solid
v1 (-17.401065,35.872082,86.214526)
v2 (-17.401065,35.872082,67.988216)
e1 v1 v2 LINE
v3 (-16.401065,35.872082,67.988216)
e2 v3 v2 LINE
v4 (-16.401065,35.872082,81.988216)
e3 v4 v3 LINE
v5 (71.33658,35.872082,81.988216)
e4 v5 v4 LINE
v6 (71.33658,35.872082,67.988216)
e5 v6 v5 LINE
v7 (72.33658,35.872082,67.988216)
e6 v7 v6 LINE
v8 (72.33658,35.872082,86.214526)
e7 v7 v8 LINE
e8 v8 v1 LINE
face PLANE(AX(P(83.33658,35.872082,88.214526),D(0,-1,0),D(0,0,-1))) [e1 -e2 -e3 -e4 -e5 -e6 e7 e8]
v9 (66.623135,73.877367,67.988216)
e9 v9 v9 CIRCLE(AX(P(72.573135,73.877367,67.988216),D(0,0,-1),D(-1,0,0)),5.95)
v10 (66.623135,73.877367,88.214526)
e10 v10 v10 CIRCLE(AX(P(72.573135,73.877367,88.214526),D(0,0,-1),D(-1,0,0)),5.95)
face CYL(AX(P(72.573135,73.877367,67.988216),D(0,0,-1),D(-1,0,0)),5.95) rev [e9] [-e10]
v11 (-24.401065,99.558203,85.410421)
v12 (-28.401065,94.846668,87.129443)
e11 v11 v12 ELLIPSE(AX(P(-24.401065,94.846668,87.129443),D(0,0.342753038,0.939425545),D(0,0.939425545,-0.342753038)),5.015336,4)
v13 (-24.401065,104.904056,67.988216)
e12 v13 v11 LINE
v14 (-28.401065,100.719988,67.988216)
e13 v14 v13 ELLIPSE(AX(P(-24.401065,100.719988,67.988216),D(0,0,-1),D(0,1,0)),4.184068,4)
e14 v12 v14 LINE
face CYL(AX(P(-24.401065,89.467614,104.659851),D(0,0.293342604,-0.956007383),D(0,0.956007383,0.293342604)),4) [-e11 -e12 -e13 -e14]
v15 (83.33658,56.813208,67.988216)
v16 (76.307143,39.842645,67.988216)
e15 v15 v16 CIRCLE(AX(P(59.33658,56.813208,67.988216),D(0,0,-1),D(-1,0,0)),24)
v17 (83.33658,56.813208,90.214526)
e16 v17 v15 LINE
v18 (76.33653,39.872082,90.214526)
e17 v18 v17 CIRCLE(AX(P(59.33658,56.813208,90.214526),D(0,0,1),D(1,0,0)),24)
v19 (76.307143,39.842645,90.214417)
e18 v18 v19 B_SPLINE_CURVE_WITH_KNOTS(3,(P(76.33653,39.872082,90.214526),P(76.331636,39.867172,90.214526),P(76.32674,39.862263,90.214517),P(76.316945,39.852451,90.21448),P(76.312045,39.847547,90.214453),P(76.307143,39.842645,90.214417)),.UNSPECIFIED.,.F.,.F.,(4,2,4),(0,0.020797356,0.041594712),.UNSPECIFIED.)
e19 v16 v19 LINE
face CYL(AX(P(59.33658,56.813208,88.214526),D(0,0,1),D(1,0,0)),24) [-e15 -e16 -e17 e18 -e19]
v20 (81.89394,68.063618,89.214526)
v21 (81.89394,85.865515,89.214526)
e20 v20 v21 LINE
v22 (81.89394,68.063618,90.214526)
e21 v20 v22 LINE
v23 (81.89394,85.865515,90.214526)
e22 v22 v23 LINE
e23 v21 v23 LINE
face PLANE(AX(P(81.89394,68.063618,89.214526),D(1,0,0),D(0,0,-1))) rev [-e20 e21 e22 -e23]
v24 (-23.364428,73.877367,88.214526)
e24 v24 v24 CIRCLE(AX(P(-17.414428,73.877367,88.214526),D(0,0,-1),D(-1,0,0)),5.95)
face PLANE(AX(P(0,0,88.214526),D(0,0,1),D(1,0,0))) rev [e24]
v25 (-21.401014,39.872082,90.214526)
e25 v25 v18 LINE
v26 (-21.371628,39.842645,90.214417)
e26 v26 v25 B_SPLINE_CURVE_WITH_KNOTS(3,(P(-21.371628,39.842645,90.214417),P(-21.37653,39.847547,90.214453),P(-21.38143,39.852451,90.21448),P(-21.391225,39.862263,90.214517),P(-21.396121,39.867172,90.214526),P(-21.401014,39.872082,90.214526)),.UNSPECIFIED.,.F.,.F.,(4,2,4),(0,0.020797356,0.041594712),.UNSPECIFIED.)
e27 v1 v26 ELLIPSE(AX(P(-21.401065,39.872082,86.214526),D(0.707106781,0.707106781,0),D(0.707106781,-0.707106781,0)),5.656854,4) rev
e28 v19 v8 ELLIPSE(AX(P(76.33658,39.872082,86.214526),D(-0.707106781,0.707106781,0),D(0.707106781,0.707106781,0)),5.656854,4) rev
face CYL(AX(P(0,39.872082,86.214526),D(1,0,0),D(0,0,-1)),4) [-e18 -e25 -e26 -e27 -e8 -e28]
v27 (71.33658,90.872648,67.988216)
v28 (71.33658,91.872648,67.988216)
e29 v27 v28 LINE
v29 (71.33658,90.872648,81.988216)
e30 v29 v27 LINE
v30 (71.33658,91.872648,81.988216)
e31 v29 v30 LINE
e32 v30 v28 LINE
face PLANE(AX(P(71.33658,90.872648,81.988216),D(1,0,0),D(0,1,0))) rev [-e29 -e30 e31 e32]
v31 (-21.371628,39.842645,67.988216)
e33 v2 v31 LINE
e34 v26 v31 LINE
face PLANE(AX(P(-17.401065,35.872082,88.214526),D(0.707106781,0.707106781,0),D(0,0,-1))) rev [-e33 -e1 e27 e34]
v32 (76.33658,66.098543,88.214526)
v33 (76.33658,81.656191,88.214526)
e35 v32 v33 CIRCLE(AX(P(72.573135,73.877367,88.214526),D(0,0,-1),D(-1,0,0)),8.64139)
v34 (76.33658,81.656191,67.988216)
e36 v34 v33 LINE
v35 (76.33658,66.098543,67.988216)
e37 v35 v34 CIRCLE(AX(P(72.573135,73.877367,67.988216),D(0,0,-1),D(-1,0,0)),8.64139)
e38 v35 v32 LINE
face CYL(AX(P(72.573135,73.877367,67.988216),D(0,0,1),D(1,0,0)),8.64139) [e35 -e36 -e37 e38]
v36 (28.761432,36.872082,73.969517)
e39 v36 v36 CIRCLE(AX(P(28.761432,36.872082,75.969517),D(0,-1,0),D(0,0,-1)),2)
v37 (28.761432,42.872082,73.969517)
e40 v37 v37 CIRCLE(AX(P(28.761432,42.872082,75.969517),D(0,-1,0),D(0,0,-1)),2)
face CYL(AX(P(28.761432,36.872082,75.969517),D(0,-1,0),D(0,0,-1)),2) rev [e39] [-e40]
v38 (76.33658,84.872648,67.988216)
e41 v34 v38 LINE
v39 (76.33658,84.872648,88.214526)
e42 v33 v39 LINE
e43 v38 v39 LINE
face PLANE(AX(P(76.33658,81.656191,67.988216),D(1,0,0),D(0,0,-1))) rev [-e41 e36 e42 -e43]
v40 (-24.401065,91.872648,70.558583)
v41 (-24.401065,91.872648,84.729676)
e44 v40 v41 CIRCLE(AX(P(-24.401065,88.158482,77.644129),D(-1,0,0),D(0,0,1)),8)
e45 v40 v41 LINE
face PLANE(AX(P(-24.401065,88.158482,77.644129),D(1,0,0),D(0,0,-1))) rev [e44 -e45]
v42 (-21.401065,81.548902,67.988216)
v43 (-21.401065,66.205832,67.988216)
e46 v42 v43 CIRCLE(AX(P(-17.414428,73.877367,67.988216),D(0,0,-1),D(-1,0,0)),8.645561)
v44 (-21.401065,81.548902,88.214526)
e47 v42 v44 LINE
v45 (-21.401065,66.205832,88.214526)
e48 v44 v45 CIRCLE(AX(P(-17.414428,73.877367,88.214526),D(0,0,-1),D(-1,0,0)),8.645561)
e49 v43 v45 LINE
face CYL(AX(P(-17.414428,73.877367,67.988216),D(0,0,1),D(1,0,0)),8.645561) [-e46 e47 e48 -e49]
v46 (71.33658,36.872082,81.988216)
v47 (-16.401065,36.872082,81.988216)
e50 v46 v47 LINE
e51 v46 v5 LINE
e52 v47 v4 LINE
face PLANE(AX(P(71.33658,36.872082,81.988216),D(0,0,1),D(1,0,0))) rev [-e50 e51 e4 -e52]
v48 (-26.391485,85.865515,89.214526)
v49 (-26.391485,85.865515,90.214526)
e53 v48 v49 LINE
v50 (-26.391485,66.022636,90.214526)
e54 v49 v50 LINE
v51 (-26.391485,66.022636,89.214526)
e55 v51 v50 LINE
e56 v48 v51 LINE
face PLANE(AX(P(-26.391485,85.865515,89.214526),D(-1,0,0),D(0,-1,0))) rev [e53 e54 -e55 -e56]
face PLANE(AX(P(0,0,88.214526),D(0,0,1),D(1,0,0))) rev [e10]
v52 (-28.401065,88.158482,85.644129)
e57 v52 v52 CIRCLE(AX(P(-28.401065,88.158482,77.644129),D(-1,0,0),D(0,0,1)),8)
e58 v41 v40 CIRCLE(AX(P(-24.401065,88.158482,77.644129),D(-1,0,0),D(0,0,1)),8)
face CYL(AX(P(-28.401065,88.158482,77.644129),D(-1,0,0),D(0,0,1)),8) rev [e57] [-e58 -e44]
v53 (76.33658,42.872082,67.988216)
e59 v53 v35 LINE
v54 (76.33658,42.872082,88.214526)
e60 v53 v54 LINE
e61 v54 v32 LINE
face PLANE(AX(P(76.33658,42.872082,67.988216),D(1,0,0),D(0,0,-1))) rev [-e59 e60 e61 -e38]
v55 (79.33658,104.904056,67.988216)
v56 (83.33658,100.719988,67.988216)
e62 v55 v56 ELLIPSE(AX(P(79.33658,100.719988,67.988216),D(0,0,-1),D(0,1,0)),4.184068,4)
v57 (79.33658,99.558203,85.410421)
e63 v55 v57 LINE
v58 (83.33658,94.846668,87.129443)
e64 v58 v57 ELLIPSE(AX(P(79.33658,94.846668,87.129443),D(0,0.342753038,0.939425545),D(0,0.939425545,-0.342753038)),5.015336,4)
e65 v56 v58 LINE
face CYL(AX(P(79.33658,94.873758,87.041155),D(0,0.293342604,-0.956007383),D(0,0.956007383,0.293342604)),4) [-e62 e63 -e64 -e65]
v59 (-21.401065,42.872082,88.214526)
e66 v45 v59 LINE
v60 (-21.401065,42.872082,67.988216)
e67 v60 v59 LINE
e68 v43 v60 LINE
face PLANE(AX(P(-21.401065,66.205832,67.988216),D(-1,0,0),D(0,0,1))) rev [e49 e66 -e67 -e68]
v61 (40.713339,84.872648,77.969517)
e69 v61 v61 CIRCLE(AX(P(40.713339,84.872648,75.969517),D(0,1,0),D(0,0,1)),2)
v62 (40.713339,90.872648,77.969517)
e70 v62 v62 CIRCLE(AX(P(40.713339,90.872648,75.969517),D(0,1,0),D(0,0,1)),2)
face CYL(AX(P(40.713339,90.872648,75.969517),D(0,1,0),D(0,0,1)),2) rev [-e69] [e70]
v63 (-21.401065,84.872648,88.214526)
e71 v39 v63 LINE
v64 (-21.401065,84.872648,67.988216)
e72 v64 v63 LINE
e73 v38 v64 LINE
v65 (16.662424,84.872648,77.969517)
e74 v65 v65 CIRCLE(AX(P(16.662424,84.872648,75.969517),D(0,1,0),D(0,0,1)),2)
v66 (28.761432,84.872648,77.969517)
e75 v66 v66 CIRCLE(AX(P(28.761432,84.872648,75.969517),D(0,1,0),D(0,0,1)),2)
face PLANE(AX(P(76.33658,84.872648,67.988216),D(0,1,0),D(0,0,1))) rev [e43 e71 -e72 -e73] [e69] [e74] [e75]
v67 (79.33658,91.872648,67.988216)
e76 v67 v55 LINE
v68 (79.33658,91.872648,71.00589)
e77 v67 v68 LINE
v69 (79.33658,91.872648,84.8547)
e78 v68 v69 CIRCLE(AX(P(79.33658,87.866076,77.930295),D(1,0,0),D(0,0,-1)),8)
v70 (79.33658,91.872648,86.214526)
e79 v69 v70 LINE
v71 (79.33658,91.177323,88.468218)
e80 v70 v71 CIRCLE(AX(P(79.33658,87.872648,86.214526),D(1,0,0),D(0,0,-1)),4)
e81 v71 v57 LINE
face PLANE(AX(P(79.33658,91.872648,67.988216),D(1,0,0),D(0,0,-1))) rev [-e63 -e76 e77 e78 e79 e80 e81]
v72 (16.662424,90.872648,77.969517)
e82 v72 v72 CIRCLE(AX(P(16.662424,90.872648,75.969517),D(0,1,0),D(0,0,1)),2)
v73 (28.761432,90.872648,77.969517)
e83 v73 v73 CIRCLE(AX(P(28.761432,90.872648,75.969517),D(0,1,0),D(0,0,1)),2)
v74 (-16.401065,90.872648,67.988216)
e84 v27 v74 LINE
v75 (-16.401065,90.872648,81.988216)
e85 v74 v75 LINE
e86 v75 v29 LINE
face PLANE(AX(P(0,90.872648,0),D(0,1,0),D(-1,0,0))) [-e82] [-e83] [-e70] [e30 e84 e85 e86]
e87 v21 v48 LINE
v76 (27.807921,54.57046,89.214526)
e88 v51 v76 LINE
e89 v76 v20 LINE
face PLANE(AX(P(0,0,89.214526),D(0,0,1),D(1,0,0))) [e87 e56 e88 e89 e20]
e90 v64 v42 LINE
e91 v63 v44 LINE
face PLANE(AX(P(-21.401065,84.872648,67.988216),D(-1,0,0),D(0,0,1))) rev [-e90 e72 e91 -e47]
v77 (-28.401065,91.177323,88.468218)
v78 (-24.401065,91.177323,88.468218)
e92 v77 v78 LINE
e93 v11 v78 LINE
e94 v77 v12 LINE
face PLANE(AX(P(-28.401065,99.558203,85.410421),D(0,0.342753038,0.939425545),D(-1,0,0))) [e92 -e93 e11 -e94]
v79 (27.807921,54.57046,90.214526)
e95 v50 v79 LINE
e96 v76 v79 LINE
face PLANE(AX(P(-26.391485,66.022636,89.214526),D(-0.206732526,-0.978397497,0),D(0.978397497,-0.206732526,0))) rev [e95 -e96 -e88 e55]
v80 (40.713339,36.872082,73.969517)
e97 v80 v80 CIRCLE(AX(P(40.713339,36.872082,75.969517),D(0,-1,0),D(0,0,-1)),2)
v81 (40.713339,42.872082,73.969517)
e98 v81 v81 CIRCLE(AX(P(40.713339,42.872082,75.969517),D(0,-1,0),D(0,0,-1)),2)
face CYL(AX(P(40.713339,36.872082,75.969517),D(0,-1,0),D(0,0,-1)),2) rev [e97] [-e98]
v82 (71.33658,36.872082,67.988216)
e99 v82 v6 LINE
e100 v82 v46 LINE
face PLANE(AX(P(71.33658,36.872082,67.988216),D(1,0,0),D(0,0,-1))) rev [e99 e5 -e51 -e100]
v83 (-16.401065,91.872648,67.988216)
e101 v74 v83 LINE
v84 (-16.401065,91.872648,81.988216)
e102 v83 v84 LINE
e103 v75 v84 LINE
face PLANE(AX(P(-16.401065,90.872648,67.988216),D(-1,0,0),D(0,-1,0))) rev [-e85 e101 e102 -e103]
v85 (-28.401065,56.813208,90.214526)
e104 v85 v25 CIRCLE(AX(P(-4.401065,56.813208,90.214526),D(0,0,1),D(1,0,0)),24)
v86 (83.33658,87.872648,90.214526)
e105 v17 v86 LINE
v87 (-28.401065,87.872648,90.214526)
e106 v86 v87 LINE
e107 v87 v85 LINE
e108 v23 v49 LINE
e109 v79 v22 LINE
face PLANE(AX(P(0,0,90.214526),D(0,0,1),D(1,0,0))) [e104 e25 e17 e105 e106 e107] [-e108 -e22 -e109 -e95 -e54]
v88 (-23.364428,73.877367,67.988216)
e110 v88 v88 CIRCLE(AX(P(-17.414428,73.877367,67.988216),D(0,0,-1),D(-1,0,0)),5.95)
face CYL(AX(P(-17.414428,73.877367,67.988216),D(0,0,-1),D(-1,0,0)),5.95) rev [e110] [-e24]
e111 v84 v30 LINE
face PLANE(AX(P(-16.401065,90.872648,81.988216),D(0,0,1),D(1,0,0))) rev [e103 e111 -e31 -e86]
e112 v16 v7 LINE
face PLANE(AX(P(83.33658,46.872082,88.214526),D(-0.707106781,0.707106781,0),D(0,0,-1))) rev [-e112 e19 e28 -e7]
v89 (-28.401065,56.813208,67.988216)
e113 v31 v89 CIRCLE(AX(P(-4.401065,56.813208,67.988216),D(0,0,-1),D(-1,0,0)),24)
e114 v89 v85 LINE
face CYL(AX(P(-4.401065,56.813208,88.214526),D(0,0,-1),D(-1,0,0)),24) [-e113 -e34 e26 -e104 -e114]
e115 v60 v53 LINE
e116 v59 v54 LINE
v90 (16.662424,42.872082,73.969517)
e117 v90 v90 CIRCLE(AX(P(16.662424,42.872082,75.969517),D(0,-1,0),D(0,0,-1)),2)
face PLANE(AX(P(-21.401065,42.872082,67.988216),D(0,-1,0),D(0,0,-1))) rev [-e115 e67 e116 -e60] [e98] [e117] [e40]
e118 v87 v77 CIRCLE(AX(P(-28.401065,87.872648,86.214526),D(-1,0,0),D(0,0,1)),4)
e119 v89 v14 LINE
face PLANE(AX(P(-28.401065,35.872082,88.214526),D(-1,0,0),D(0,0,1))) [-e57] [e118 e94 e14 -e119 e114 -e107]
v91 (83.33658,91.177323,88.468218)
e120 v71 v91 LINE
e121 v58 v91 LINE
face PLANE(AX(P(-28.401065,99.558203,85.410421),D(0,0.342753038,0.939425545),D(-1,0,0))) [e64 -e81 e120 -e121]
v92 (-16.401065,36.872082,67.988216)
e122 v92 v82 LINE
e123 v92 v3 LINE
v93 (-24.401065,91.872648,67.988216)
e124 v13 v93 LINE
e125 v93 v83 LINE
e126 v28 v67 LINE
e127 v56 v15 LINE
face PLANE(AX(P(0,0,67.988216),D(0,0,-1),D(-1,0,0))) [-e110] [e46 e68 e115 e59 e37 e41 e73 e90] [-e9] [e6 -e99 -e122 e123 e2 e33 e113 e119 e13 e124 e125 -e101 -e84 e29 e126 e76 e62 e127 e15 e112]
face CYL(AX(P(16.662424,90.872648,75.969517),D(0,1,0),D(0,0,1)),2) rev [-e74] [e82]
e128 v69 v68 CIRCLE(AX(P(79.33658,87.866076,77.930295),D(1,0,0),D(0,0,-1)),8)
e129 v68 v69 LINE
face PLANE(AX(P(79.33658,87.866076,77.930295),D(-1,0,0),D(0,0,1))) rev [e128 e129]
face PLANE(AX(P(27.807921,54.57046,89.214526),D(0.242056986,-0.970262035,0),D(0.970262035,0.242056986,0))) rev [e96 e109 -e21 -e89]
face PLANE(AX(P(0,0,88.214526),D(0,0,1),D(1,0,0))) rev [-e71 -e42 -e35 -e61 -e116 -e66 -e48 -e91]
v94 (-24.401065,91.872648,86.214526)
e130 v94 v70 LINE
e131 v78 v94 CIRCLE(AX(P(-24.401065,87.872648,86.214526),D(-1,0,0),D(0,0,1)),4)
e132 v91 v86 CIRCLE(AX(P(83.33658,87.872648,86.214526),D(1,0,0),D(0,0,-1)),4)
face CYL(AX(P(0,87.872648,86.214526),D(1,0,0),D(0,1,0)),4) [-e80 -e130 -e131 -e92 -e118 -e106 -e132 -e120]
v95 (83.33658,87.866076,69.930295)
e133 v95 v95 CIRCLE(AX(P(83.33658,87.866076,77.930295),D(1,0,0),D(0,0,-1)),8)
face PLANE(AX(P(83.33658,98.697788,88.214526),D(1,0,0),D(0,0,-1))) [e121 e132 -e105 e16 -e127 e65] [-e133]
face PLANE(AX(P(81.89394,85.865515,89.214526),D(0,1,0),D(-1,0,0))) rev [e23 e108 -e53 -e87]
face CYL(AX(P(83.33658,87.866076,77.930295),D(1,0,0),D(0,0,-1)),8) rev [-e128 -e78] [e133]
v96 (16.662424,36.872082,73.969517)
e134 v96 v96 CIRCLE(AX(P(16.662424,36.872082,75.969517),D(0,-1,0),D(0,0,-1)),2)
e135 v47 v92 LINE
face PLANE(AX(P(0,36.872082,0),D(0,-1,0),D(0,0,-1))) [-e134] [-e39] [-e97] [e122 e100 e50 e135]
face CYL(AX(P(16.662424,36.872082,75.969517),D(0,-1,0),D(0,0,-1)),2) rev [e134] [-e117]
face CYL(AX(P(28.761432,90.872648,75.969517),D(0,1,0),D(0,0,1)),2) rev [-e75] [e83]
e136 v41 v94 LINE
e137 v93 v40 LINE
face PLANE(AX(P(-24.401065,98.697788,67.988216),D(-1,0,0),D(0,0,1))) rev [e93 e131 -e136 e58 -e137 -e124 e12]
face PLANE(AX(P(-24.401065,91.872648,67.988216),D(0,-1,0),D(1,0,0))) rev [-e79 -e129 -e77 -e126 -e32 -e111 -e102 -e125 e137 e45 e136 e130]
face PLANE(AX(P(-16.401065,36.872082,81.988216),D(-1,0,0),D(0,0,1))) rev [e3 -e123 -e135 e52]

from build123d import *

# Parameters (mm, degrees)
SKETCH4_W                      = 111.737645783
SKETCH4_H                      = 62.825705526
BOSS_EXTRUDE3_DEPTH            = 20.22630919
SKETCH5_W                      = 103.737645783
SKETCH5_H                      = 6.825139403
CUT_EXTRUDE1_DEPTH             = 131.749158903
CUT_EXTRUDE2_DEPTH             = 131.749158903
SKETCH7_W                      = 87.737645783
SKETCH7_H                      = 14
CUT_EXTRUDE3_DEPTH             = 1
SKETCH8_W                      = 87.737645783
SKETCH8_H                      = 14
CUT_EXTRUDE4_DEPTH             = 1
DRAFT1_ANGLE                   = 17.058179216
F_16_0_16_DIAMETER_HOLE1_D     = 16
F_16_0_16_DIAMETER_HOLE1_DEPTH = 4
F_16_0_16_DIAMETER_HOLE2_D     = 16
F_16_0_16_DIAMETER_HOLE2_DEPTH = 4
F_4_0_4_DIAMETER_HOLE1_D       = 4
F_4_0_4_DIAMETER_HOLE1_DEPTH   = 6
F_4_0_4_DIAMETER_HOLE2_D       = 4
F_4_0_4_DIAMETER_HOLE2_DEPTH   = 68.031973705
M10_CLEARANCE_HOLE1_D          = 11.9
CHAMFER1_SIZE                  = 6.825139403
CHAMFER1_SIZE2                 = 2.933140798
CHAMFER2_SIZE                  = 6.825139403
CHAMFER2_SIZE2                 = 2.933140798
SKETCH19_W                     = 111.737645783
SKETCH19_H                     = 56.000566123
BOSS_EXTRUDE4_DEPTH            = 2
FILLET7_R                      = 4
CHAMFER3_SIZE                  = 11
CHAMFER4_SIZE                  = 11
FILLET9_R                      = 24
FILLET10_R                     = 24
CUT_EXTRUDE6_DEPTH             = 1
FILLET13_R                     = 4
FILLET14_R                     = 4
FILLET15_R                     = 4


# Some blends are built 0.0001 mm under size
with BuildPart() as part:
    # Sketch4 → Boss-Extrude3 (new body)
    with BuildSketch(Plane(origin=(0, 0, 67.988216463), x_dir=(-1, 0, 0), z_dir=(0, 0, -1))):
        with Locations((-27.467757585, 67.284935079)):
            Rectangle(SKETCH4_W, SKETCH4_H)
    extrude(amount=-BOSS_EXTRUDE3_DEPTH)

    # Sketch5 → Cut-Extrude1 (cut, through all)
    with BuildSketch(Plane.XY.offset(88.214525653)):
        with Locations((27.467757585, 95.285218141)):
            Rectangle(SKETCH5_W, SKETCH5_H)
    extrude(amount=-CUT_EXTRUDE1_DEPTH, mode=Mode.SUBTRACT)

    # Sketch6 → Cut-Extrude2 (cut, through all)
    with BuildSketch(Plane.XY.offset(88.214525653)):
        with BuildLine():
            Line((-21.401065306, 66.205832154), (-21.401065306, 42.872082316))
            Line((-21.401065306, 42.872082316), (76.336580477, 42.872082316))
            Line((76.336580477, 42.872082316), (76.336580477, 66.098543331))
            ThreePointArc((76.336580477, 66.098543331), (63.931745492, 73.877367201), (76.336580477, 81.65619107))
            Line((76.336580477, 81.65619107), (76.336580477, 84.872648439))
            Line((76.336580477, 84.872648439), (-21.401065306, 84.872648439))
            Line((-21.401065306, 84.872648439), (-21.401065306, 81.548902247))
            ThreePointArc((-21.401065306, 81.548902247), (-8.768867408, 73.877367201), (-21.401065306, 66.205832154))
        make_face()
    extrude(amount=-CUT_EXTRUDE2_DEPTH, mode=Mode.SUBTRACT)

    # Sketch7 → Cut-Extrude3 (cut)
    with BuildSketch(Plane(origin=(0, 91.872648439, 0), x_dir=(-1, 0, 0), z_dir=(0, 1, 0))):
        with Locations((-27.467757585, 74.988216463)):
            Rectangle(SKETCH7_W, SKETCH7_H)
    extrude(amount=-CUT_EXTRUDE3_DEPTH, mode=Mode.SUBTRACT)

    # Sketch8 → Cut-Extrude4 (cut)
    with BuildSketch(Plane.XZ.offset(-35.872082316)):
        with Locations((27.467757585, 74.988216463)):
            Rectangle(SKETCH8_W, SKETCH8_H)
    extrude(amount=-CUT_EXTRUDE4_DEPTH, mode=Mode.SUBTRACT)

    # Draft1
    draft1_faces = [part.faces().sort_by_distance(p)[0] for p in [
        (-26.401065306, 98.697787842, 78.101371058),
        (81.336580477, 98.697787842, 78.101371058),
    ]]
    draft(draft1_faces, Plane.XY.offset(88.214525653), DRAFT1_ANGLE)

    # Ø16.0 (16) Diameter Hole1
    with Locations(Plane.ZY.offset(28.401065306)):
        with Locations((77.644129293, 88.158482369)):
            Hole(F_16_0_16_DIAMETER_HOLE1_D / 2, depth=F_16_0_16_DIAMETER_HOLE1_DEPTH)

    # Ø16.0 (16) Diameter Hole2
    with Locations(Plane(origin=(83.336580477, 0, 0), x_dir=(0, 0, -1), z_dir=(1, 0, 0))):
        with Locations((-77.930295014, 87.866076089)):
            Hole(F_16_0_16_DIAMETER_HOLE2_D / 2, depth=F_16_0_16_DIAMETER_HOLE2_DEPTH)

    # Ø4.0 (4) Diameter Hole1
    with Locations(Plane(origin=(0, 90.872648439, 0), x_dir=(1, 0, 0), z_dir=(0, 1, 0))):
        with Locations((40.713339239, -75.969517026), (28.761431707, -75.969517026), (16.662423773, -75.969517026)):
            Hole(F_4_0_4_DIAMETER_HOLE1_D / 2, depth=F_4_0_4_DIAMETER_HOLE1_DEPTH)

    # Ø4.0 (4) Diameter Hole2
    with Locations(Plane(origin=(0, 36.872082316, 0), x_dir=(-1, 0, 0), z_dir=(0, -1, 0))):
        with Locations((-40.713339239, -75.969517026), (-28.761431707, -75.969517026), (-16.662423773, -75.969517026)):
            Hole(F_4_0_4_DIAMETER_HOLE2_D / 2, depth=F_4_0_4_DIAMETER_HOLE2_DEPTH)

    # M10 Clearance Hole1 (through all)
    with Locations(Plane(origin=(0, 0, 67.988216463), x_dir=(-1, 0, 0), z_dir=(0, 0, -1))):
        with Locations((-72.573135404, 73.877367201), (17.414428357, 73.877367201)):
            Hole(M10_CLEARANCE_HOLE1_D / 2)

    # Chamfer1
    chamfer1_edges = [part.edges().sort_by_distance(p)[0] for p in [
        (81.336580477, 98.697787842, 88.214525653),
    ]]
    chamfer1_side = [part.faces().sort_by_distance(p)[0] for p in [
        (27.467757585, 37.153970406, 88.214525653),
    ]]
    chamfer(chamfer1_edges, length=CHAMFER1_SIZE, length2=CHAMFER1_SIZE2, reference=chamfer1_side[0])

    # Chamfer2
    chamfer2_edges = [part.edges().sort_by_distance(p)[0] for p in [
        (-26.401065306, 98.697787842, 88.214525653),
    ]]
    chamfer2_side = [part.faces().sort_by_distance(p)[0] for p in [
        (82.054692387, 63.872365377, 88.214525653),
    ]]
    chamfer(chamfer2_edges, length=CHAMFER2_SIZE, length2=CHAMFER2_SIZE2, reference=chamfer2_side[0])

    # Sketch19 → Boss-Extrude4 (add)
    with BuildSketch(Plane.XY.offset(88.214525653)):
        with Locations((27.467757585, 63.872365378)):
            Rectangle(SKETCH19_W, SKETCH19_H)
    extrude(amount=BOSS_EXTRUDE4_DEPTH)

    # Fillet7
    # the kernel refuses this fillet: 4 mm, written as the material it takes off along each edge
    with BuildSketch(Plane(origin=(93.336580477, 91.872648439, 90.214525653), x_dir=(0, 0, -1), z_dir=(-1, 0, 0))) as fillet7_piece_1_section:
        with BuildLine():
            CenterArc((FILLET7_R, FILLET7_R), FILLET7_R, 180, 90)
            Line((0, FILLET7_R), (0, 0))
            Line((0, 0), (FILLET7_R, 0))
        make_face()
    fillet7_piece_1 = extrude(amount=131.737645784, mode=Mode.PRIVATE)
    fillet7_piece_1 = split(fillet7_piece_1, bisect_by=Plane(origin=(81.336580477, 90.577181296, 88.687181842), z_dir=(0, 0.34275303765814863, 0.9394255453074032)), keep=Keep.TOP, mode=Mode.PRIVATE)
    add(fillet7_piece_1, mode=Mode.SUBTRACT)
    with BuildSketch(Plane(origin=(93.336580477, 91.872648439, 90.214525653), x_dir=(0, 0, -1), z_dir=(-1, 0, 0))) as fillet7_piece_2_section:
        with BuildLine():
            CenterArc((FILLET7_R, FILLET7_R), FILLET7_R, 180, 90)
            Line((0, FILLET7_R), (0, 0))
            Line((0, 0), (FILLET7_R, 0))
        make_face()
    fillet7_piece_2 = extrude(amount=131.737645784, mode=Mode.PRIVATE)
    fillet7_piece_2 = split(fillet7_piece_2, bisect_by=Plane(origin=(-24.401065306, 91.673256094, 87.815354023), z_dir=(1, 0, 0)), keep=Keep.TOP, mode=Mode.PRIVATE)
    fillet7_piece_2 = split(fillet7_piece_2, bisect_by=Plane(origin=(79.336580477, 91.673256094, 87.815354023), z_dir=(-1, 0, 0)), keep=Keep.TOP, mode=Mode.PRIVATE)
    add(fillet7_piece_2, mode=Mode.SUBTRACT)

    # Chamfer3
    chamfer3_edges = [part.edges().sort_by_distance(p)[0] for p in [
        (83.336580477, 35.872082316, 79.101371058),
    ]]
    chamfer(chamfer3_edges, length=CHAMFER3_SIZE)

    # Chamfer4
    chamfer4_edges = [part.edges().sort_by_distance(p)[0] for p in [
        (-28.401065306, 35.872082316, 79.101371058),
    ]]
    chamfer(chamfer4_edges, length=CHAMFER4_SIZE)

    # Fillet9
    fillet9_edges = [part.edges().sort_by_distance(p)[0] for p in [
        (83.336580477, 46.872082316, 79.101371058),
    ]]
    fillet(fillet9_edges, radius=FILLET9_R)

    # Fillet10
    fillet10_edges = [part.edges().sort_by_distance(p)[0] for p in [
        (-28.401065306, 46.872082316, 79.101371058),
    ]]
    fillet(fillet10_edges, radius=FILLET10_R)

    # Sketch21 → Cut-Extrude6 (cut)
    with BuildSketch(Plane.XY.offset(90.214525653)):
        Polygon((-26.391485045, 85.865514682), (-26.391485045, 66.022635818), (27.807921223, 54.570460017), (81.893939612, 68.063617644), (81.893939612, 85.865514682), align=None)
    extrude(amount=-CUT_EXTRUDE6_DEPTH, mode=Mode.SUBTRACT)

    # Fillet13
    fillet13_edges = [part.edges().sort_by_distance(p)[0] for p in [
        (-28.401065306, 102.231129511, 76.699318929),
    ]]
    fillet(fillet13_edges, radius=FILLET13_R - 0.0001)  # a hair under: the kernel refuses the full size

    # Fillet14
    fillet14_edges = [part.edges().sort_by_distance(p)[0] for p in [
        (83.336580477, 102.231129511, 76.699318929),
    ]]
    fillet(fillet14_edges, radius=FILLET14_R - 0.0001)  # a hair under: the kernel refuses the full size

    # Fillet15
    fillet15_edges = [part.edges().sort_by_distance(p)[0] for p in [
        (27.467757585, 35.872082316, 90.214525653),
    ]]
    fillet(fillet15_edges, radius=FILLET15_R)


solid = part.part
